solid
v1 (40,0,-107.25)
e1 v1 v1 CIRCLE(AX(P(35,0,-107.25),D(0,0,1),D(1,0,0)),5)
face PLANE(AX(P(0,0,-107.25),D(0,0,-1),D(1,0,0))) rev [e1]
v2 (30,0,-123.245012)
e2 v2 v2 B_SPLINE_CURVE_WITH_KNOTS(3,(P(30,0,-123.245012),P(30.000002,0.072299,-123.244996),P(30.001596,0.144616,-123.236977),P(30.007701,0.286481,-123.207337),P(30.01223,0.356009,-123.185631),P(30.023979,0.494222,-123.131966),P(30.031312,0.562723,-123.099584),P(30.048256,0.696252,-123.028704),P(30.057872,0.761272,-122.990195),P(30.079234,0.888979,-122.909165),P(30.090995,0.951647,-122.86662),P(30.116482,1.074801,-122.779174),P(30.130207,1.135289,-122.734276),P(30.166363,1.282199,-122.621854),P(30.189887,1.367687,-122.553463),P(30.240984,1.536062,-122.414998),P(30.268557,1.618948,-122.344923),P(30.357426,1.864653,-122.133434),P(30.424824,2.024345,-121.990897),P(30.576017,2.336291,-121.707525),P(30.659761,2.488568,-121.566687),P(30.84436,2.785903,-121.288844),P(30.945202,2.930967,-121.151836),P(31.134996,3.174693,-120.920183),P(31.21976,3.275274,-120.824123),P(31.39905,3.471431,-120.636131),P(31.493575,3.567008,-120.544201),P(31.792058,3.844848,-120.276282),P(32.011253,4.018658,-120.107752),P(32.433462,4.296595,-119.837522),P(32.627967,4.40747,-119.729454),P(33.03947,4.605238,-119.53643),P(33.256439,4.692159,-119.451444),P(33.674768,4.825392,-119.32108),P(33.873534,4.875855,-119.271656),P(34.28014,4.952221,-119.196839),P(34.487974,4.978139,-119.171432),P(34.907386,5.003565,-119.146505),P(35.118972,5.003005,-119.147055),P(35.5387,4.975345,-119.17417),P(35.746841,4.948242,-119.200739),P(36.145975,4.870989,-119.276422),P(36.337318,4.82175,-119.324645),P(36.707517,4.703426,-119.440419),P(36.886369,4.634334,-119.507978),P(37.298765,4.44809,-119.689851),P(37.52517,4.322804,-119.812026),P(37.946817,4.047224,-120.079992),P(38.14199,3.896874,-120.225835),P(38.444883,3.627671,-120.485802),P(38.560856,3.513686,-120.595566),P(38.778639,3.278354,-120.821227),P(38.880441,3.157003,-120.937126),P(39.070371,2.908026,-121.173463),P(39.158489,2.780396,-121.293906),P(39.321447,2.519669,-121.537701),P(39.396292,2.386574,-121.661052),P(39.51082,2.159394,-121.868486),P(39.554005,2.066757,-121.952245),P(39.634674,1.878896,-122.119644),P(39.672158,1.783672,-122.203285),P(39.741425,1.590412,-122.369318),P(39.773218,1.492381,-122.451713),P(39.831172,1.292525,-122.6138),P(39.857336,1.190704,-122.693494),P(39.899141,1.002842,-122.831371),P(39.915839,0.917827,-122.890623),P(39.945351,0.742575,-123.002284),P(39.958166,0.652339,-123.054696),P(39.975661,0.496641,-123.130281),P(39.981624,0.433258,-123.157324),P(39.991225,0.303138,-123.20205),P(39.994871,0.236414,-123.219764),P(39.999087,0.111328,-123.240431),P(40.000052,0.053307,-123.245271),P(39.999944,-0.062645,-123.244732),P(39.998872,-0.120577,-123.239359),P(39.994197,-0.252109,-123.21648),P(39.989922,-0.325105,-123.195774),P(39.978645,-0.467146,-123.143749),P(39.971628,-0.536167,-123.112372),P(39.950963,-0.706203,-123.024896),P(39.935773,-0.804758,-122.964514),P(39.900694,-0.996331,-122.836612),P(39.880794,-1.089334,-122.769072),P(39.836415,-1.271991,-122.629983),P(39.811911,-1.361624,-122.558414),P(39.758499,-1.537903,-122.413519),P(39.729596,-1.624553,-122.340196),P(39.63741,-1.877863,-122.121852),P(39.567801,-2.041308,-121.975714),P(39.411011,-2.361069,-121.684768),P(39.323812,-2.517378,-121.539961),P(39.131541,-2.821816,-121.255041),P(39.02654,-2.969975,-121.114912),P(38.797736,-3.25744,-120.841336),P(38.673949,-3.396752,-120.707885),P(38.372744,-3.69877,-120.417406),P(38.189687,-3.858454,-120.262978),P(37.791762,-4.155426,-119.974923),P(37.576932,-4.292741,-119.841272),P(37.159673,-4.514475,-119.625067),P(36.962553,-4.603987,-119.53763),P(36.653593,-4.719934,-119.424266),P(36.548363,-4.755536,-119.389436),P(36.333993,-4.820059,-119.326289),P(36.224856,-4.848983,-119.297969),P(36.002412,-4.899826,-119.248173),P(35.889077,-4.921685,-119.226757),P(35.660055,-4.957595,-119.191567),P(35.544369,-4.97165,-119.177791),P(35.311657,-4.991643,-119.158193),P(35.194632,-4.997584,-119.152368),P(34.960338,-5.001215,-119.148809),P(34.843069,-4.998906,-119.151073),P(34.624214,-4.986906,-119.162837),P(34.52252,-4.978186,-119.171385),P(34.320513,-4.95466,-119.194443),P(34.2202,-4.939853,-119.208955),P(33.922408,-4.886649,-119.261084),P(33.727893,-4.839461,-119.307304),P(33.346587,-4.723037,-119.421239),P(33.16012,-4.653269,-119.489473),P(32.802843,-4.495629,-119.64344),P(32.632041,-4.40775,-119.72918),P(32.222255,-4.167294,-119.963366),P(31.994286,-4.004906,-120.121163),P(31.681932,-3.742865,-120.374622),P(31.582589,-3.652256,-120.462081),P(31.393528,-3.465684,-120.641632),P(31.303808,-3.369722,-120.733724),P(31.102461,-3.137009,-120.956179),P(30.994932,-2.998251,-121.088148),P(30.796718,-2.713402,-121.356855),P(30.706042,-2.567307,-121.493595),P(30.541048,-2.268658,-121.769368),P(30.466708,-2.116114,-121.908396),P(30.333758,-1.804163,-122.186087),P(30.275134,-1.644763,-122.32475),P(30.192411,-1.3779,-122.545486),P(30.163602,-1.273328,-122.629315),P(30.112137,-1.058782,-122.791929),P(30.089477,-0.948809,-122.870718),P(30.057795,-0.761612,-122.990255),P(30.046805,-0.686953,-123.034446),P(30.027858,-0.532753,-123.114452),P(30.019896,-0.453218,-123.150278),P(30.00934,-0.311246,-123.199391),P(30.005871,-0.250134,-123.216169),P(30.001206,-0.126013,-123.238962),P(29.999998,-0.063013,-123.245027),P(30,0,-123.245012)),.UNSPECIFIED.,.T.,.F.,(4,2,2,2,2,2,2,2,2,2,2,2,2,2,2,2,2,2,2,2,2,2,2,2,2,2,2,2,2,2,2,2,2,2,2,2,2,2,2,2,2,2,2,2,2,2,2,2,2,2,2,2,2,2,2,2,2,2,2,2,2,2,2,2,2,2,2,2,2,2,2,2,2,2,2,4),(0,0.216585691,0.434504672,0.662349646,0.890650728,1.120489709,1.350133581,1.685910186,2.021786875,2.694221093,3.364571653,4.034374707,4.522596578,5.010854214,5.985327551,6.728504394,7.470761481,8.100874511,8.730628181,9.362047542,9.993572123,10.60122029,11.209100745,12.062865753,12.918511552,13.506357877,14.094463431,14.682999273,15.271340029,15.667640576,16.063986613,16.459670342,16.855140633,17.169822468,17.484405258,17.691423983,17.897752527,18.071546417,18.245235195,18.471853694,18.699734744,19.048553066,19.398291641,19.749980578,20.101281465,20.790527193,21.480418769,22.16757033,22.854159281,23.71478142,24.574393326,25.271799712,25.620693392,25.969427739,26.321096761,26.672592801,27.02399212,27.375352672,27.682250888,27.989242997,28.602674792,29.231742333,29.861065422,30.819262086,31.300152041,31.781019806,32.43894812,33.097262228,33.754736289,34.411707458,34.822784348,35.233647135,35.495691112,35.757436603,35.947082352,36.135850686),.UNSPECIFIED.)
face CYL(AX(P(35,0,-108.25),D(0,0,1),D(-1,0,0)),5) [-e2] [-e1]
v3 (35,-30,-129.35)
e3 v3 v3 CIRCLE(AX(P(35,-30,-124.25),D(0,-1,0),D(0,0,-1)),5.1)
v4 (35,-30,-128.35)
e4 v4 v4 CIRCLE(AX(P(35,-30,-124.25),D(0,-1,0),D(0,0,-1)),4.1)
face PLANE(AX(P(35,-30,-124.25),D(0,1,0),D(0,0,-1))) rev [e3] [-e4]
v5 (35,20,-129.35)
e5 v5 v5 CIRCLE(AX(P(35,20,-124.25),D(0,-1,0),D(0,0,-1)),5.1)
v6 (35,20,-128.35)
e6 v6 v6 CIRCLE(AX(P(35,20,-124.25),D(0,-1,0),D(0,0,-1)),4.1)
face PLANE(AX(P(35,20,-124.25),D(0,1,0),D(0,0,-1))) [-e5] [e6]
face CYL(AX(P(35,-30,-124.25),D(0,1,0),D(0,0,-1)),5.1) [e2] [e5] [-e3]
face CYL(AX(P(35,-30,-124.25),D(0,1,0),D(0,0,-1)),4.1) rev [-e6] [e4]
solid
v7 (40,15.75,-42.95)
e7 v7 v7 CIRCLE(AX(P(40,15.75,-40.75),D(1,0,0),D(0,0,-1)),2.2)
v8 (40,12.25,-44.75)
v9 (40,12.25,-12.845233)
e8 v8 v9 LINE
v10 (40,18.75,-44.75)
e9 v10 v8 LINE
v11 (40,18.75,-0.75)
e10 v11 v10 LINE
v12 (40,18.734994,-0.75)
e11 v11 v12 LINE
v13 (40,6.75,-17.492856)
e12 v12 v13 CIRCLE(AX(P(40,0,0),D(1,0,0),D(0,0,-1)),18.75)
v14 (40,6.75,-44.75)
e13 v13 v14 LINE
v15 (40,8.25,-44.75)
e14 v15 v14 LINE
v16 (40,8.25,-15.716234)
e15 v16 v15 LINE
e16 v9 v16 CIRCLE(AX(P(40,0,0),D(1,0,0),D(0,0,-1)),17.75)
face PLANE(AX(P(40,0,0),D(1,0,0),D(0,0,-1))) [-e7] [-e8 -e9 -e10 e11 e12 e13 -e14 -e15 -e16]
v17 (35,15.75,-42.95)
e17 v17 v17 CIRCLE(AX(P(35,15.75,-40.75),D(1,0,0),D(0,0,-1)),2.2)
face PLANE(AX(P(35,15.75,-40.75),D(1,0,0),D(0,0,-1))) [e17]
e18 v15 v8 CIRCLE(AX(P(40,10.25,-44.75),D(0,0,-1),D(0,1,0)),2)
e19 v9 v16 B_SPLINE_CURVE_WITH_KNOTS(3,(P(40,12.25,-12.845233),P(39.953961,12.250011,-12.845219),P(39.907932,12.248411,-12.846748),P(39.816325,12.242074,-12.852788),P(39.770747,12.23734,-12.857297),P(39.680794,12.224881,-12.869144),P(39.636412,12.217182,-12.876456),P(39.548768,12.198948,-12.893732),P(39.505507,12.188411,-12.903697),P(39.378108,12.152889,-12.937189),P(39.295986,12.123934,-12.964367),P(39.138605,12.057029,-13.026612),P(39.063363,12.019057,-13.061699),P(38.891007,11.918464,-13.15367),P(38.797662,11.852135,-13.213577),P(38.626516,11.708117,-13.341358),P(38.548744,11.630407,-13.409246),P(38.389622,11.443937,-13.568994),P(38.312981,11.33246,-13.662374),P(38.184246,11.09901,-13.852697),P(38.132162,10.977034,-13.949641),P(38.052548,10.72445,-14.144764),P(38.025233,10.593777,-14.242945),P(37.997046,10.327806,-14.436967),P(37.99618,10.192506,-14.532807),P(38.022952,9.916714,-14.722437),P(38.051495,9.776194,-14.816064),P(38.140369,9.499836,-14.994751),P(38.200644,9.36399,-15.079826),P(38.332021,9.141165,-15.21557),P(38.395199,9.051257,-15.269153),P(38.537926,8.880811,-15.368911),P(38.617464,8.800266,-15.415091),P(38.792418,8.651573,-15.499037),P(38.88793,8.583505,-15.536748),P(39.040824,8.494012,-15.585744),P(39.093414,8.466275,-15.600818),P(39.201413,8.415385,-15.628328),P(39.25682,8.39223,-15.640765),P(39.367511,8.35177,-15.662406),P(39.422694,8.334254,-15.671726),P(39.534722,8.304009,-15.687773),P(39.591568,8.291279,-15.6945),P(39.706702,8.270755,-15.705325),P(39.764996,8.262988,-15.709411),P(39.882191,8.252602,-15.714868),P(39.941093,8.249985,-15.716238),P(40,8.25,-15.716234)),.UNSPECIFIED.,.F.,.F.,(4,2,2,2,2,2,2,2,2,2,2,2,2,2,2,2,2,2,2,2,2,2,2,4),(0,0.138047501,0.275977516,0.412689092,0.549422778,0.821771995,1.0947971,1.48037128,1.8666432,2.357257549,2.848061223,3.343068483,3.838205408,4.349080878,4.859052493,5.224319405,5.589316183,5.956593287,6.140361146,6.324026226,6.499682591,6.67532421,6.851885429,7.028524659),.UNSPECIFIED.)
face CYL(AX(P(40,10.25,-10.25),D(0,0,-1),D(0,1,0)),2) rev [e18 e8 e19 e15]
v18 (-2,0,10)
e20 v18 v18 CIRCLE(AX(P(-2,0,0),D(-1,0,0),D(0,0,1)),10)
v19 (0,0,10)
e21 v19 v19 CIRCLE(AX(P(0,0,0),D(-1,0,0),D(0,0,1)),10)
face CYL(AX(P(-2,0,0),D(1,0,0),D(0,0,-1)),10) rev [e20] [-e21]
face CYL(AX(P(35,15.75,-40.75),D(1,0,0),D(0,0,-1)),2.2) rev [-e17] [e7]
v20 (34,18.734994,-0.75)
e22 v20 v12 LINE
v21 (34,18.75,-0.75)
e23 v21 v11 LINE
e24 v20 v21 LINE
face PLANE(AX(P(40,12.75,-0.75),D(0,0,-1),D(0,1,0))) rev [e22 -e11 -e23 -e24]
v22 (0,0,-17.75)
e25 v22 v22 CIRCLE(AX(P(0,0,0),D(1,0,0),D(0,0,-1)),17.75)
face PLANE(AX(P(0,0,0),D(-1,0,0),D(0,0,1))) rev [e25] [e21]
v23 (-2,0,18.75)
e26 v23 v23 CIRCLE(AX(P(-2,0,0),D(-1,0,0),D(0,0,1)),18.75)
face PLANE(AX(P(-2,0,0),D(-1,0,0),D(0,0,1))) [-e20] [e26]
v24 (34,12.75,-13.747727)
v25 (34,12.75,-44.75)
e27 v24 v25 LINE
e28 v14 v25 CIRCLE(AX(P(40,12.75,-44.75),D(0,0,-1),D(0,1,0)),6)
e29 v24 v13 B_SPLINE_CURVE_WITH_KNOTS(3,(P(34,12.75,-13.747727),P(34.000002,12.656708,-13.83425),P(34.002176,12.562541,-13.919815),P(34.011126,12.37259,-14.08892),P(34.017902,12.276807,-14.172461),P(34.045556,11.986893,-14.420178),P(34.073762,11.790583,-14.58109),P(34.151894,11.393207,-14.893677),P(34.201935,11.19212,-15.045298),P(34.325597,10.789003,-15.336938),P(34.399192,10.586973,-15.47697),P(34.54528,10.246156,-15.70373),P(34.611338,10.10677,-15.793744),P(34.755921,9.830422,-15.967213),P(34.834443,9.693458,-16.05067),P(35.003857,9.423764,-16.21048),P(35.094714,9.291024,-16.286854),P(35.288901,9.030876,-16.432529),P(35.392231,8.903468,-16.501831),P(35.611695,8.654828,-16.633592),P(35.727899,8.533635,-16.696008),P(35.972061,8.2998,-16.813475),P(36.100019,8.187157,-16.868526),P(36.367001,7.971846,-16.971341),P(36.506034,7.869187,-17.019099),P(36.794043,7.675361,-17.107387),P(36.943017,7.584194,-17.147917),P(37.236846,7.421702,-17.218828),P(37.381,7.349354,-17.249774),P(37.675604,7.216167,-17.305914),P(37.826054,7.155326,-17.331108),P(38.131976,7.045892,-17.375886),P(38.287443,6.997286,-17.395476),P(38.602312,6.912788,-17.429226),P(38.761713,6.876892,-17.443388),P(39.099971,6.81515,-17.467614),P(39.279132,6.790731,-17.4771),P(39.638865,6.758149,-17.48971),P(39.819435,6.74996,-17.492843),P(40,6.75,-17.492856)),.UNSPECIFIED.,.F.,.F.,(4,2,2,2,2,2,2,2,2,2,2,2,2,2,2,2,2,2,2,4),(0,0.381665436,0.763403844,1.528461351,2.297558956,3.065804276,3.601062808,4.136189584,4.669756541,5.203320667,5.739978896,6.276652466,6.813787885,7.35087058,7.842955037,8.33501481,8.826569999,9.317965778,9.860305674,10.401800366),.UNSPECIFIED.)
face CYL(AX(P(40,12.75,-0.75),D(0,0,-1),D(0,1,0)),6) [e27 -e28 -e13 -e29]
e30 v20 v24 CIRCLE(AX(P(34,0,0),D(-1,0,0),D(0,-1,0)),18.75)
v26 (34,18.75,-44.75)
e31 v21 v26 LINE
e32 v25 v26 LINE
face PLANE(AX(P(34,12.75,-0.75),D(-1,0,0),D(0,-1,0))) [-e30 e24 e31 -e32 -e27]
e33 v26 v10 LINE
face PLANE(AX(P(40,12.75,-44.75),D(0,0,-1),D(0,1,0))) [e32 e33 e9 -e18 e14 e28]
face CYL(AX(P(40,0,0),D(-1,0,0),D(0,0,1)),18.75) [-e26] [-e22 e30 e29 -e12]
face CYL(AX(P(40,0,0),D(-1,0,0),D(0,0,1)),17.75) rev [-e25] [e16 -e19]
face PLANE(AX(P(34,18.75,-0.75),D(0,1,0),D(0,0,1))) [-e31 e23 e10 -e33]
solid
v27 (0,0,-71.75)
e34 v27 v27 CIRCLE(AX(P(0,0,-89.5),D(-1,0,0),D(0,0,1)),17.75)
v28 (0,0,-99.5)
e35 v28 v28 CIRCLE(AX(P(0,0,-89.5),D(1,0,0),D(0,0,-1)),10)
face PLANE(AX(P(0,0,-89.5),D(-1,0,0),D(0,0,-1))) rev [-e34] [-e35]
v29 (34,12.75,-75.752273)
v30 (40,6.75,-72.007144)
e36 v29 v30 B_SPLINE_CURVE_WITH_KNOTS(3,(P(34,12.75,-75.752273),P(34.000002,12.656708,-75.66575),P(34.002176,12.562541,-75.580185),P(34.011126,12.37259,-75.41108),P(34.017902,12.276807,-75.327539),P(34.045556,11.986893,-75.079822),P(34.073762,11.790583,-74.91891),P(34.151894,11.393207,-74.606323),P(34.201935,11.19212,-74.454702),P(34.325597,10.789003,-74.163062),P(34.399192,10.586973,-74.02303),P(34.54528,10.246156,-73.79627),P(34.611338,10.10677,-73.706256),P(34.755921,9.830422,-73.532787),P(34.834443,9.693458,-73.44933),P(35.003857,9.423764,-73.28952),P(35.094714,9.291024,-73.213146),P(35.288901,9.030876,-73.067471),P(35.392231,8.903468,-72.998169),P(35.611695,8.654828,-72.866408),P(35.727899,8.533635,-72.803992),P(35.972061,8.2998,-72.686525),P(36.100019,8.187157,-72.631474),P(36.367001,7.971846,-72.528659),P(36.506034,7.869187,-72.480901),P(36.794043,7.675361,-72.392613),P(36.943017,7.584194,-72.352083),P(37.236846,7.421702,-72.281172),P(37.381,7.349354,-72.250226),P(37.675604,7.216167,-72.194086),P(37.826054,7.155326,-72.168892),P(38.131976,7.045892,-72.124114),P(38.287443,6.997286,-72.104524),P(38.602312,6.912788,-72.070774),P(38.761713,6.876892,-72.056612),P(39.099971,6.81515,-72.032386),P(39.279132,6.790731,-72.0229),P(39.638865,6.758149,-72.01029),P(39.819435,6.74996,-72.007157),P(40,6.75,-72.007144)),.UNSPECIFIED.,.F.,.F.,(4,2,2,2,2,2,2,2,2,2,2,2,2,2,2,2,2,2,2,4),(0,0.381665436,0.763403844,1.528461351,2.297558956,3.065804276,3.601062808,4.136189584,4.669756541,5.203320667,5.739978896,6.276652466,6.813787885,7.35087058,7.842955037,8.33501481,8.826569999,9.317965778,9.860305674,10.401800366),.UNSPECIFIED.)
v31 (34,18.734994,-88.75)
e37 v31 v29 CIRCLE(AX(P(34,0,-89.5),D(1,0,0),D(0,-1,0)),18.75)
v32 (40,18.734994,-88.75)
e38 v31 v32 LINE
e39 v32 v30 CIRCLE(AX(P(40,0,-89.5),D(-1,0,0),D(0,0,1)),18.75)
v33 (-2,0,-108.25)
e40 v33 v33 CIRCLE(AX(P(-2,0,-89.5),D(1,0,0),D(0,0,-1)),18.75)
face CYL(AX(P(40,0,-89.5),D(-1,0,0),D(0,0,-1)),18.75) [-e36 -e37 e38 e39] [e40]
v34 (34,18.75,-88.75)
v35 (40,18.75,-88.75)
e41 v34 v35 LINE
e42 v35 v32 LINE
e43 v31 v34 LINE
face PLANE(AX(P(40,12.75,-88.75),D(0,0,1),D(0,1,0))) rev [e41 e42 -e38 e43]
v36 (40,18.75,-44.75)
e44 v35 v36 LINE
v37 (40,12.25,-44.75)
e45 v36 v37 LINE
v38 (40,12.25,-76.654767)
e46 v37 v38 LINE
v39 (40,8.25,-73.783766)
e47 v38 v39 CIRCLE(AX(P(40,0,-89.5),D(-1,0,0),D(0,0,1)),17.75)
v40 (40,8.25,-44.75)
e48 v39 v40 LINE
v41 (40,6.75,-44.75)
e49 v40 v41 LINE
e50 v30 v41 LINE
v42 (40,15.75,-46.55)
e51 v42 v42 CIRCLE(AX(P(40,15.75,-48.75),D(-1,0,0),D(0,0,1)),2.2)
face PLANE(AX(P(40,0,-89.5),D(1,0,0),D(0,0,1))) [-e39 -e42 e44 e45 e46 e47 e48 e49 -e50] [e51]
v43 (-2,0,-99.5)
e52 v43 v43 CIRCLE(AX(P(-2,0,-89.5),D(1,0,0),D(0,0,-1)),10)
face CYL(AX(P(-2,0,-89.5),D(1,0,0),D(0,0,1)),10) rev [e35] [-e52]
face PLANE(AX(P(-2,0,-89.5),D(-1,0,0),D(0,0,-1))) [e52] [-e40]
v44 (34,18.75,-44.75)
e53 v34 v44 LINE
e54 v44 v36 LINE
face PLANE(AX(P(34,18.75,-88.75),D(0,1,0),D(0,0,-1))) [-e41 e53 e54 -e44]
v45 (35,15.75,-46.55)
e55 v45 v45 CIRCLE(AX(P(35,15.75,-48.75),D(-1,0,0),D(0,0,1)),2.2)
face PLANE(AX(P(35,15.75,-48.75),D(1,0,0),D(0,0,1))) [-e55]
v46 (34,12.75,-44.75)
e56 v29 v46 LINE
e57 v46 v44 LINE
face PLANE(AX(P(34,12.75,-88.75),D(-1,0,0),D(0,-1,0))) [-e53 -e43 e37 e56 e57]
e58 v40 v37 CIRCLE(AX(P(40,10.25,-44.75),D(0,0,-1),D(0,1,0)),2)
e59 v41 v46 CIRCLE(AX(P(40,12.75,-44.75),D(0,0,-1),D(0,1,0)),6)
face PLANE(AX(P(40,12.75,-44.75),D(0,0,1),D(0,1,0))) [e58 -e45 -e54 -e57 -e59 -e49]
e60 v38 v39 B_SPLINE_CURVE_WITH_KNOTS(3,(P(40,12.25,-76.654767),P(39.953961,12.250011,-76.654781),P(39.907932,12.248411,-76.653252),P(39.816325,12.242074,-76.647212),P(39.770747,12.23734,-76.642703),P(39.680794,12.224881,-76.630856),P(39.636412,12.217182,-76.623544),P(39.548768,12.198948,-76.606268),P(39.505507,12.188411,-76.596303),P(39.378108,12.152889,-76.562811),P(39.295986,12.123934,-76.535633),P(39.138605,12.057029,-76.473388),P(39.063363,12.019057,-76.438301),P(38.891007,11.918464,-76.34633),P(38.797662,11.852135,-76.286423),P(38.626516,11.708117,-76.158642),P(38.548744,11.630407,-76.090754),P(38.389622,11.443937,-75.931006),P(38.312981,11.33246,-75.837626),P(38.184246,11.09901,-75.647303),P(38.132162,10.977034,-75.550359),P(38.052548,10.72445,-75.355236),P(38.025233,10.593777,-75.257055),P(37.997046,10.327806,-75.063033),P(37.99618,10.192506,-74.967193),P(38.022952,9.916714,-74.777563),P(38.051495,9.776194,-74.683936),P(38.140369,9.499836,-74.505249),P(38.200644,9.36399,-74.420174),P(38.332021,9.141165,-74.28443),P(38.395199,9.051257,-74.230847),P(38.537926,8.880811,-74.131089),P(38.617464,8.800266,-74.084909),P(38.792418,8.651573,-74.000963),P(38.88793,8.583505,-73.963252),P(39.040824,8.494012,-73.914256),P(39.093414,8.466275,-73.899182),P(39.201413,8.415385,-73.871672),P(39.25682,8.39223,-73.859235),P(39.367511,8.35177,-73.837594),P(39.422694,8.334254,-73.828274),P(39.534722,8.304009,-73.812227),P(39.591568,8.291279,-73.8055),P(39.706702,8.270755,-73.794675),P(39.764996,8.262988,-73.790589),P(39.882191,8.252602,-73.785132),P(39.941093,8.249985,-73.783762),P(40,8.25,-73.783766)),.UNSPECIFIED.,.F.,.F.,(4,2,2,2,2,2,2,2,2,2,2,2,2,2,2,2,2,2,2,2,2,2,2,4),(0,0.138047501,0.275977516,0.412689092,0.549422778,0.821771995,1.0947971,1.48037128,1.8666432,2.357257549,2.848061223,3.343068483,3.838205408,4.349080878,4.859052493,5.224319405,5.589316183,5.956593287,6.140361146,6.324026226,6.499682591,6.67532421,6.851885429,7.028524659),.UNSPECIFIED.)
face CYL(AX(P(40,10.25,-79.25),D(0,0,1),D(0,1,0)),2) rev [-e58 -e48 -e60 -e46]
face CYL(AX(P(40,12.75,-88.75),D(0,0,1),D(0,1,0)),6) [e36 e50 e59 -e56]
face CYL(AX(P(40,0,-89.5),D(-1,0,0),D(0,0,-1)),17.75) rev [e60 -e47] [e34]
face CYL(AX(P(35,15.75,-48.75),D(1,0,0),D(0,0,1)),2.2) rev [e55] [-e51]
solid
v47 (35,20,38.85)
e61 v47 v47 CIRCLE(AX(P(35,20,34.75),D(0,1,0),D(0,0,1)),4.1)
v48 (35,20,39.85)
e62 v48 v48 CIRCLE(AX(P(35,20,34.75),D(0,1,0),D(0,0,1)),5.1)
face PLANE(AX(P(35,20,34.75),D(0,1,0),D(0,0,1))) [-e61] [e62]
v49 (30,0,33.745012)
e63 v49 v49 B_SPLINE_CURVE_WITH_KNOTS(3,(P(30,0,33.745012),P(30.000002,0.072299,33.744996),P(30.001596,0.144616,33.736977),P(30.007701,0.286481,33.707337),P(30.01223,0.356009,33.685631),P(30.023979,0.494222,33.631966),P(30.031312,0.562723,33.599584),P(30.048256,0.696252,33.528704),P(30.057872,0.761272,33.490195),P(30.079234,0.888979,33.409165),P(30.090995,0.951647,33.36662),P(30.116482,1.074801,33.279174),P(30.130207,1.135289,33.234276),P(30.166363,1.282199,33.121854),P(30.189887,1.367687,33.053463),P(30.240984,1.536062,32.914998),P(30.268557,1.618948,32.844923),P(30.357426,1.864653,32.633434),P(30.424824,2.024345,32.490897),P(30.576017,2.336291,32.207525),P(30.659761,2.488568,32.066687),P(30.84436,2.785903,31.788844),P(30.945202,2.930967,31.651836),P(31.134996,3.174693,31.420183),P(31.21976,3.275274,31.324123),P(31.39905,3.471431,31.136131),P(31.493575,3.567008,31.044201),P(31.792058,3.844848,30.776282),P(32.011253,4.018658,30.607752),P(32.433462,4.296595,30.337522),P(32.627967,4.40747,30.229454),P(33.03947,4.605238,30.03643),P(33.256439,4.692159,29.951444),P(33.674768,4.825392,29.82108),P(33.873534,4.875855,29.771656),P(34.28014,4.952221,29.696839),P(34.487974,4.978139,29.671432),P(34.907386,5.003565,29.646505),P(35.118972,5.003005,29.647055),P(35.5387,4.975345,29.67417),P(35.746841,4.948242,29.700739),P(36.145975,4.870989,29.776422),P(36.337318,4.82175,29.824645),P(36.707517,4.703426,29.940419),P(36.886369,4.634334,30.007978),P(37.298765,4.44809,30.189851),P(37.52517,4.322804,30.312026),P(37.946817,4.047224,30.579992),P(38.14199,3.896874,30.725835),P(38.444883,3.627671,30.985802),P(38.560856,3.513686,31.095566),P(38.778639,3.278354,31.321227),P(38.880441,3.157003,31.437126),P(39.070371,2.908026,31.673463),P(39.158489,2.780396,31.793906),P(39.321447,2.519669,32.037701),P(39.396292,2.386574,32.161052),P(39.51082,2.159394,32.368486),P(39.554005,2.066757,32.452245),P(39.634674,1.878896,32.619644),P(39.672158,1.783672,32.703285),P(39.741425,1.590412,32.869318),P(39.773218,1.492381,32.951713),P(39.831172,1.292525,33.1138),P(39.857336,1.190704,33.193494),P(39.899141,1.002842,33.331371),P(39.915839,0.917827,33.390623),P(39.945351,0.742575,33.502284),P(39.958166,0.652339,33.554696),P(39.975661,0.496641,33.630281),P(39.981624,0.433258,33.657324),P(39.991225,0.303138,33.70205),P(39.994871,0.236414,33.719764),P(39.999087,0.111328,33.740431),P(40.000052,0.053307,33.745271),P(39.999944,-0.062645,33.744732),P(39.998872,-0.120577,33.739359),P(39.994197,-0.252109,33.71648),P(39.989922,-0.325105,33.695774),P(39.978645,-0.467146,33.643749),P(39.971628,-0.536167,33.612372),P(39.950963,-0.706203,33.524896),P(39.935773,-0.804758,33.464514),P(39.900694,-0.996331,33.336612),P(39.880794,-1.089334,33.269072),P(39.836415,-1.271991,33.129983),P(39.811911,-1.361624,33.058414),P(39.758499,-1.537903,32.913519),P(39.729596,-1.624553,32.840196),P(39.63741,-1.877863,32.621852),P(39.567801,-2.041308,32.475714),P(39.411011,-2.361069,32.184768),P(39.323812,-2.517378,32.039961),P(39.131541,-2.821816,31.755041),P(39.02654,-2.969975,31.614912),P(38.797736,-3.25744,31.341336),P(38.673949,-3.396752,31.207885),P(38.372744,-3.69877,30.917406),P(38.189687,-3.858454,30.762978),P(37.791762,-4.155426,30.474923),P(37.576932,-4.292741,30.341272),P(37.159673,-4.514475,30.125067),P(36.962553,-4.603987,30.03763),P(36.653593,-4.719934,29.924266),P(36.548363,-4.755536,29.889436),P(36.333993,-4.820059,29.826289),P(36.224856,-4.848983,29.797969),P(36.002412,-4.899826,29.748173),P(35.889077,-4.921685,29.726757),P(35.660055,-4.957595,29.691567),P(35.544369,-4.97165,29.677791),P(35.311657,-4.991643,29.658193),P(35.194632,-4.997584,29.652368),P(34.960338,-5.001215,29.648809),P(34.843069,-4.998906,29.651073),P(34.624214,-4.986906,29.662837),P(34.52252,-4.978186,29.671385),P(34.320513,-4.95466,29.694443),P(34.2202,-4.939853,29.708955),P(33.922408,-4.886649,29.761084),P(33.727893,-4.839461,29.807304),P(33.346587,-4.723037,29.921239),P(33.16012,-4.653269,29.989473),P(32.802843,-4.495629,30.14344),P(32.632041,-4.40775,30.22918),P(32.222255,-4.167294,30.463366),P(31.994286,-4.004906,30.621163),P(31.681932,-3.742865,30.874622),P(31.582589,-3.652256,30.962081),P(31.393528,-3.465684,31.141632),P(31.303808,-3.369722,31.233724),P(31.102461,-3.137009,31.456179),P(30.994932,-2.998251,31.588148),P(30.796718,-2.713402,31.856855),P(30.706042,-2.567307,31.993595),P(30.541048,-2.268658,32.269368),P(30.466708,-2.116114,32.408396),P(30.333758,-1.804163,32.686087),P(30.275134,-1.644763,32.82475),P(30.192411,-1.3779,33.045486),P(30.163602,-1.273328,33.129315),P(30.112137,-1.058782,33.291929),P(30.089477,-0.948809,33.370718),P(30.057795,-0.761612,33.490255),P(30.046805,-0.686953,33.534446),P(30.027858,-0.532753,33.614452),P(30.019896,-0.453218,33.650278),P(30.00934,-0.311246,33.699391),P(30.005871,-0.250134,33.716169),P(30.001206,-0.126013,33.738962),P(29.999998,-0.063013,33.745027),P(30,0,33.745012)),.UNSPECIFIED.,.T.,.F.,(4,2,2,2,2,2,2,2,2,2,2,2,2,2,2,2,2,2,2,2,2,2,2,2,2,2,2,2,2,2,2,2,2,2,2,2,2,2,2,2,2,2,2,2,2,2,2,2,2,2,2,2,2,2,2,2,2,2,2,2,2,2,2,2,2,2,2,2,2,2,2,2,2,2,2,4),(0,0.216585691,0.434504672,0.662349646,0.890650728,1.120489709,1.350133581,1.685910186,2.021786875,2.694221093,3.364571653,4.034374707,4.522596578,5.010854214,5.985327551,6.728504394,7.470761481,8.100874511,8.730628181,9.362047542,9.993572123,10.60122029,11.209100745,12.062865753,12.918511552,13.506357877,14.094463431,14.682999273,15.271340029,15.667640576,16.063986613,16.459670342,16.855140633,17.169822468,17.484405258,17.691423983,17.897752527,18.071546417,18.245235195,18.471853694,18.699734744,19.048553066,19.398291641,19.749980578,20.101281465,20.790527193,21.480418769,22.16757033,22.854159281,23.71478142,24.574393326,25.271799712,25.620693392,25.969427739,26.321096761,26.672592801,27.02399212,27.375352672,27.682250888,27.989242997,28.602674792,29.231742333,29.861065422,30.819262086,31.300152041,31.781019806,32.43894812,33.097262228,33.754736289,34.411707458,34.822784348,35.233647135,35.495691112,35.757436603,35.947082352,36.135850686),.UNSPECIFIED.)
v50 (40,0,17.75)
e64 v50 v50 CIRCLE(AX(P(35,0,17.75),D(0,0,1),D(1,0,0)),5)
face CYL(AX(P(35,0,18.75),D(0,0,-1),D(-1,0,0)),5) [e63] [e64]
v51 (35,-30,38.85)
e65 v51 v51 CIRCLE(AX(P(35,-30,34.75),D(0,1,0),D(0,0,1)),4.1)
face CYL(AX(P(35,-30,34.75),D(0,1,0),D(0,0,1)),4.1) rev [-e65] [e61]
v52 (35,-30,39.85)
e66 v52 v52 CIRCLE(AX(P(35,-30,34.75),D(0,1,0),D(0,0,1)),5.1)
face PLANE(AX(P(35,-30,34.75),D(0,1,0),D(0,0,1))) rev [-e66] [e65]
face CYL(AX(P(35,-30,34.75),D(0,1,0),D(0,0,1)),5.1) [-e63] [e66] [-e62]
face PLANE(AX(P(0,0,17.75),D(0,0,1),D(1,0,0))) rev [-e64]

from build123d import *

# Parameters (mm, degrees)
SKETCH1_R                = 18.75
SKETCH1_R_2              = 17.75
BOSS_EXTRUDE1_DEPTH      = 40
BOSS_EXTRUDE2_START      = 2
SKETCH2_R                = 18.75
SKETCH2_R_2              = 10
BOSS_EXTRUDE2_DEPTH      = 2
BOSS_EXTRUDE4_START      = 17.75
BOSS_EXTRUDE4_OUTLINE_R  = 5
BOSS_EXTRUDE4_DEPTH      = 16
BOSS_EXTRUDE5_DEPTH      = 15
BOSS_EXTRUDE5_DEPTH_BACK = 35
SKETCH8_R                = 5.1
SKETCH8_R_2              = 4.1
SKETCH9_R                = 4.1
CUT_EXTRUDE1_DEPTH       = 32
BOSS_EXTRUDE6_DEPTH      = 26
BOSS_EXTRUDE6_DEPTH_BACK = 18
CUT_EXTRUDE2_START       = -26
SKETCH12_R               = 17.75
CUT_EXTRUDE2_DEPTH       = 26
SKETCH14_R               = 2.2
CUT_EXTRUDE4_DEPTH       = 5
SKETCH15_R               = 2
CUT_EXTRUDE5_DEPTH       = 34.5


# Read off the part's stored shape, not the designer's step: Boss-Extrude4
with BuildPart() as part:
    # Sketch1 → Boss-Extrude1 (new body)
    with BuildSketch(Plane.YZ):
        with Locations(Location((0, 0, 0), (0, 0, 270))):
            Circle(SKETCH1_R)
        with Locations(Location((0, 0, 0), (0, 0, 270))):
            Circle(SKETCH1_R_2, mode=Mode.SUBTRACT)
    extrude(amount=BOSS_EXTRUDE1_DEPTH)

    # Sketch2 → Boss-Extrude2 (add)
    with BuildSketch(Plane(origin=(0, 0, 0), x_dir=(0, -1, 0), z_dir=(-1, 0, 0)).offset(BOSS_EXTRUDE2_START)):
        with Locations(Location((0, 0, 0), (0, 0, 90))):
            Circle(SKETCH2_R)
        with Locations(Location((0, 0, 0), (0, 0, 90))):
            Circle(SKETCH2_R_2, mode=Mode.SUBTRACT)
    extrude(amount=-BOSS_EXTRUDE2_DEPTH)

    # Sketch11 → Boss-Extrude6 (add, two sides: drawn at the far end of the back side and taken through both)
    with BuildSketch(Plane.YX.offset(18.75).offset(-BOSS_EXTRUDE6_DEPTH_BACK)):
        with BuildLine():
            Line((6.75, 40), (18.75, 40))
            Line((18.75, 40), (18.75, 34))
            Line((18.75, 34), (12.75, 34))
            ThreePointArc((12.75, 34), (8.507359313, 35.757359313), (6.75, 40))
        make_face()
    extrude(amount=BOSS_EXTRUDE6_DEPTH + BOSS_EXTRUDE6_DEPTH_BACK)

    # Sketch12 → Cut-Extrude2 (cut)
    with BuildSketch(Plane.YZ.offset(40).offset(CUT_EXTRUDE2_START)):
        with Locations(Location((0, 0, 0), (0, 0, 270))):
            Circle(SKETCH12_R)
    extrude(amount=CUT_EXTRUDE2_DEPTH, mode=Mode.SUBTRACT)

    # Sketch14 → Cut-Extrude4 (cut)
    with BuildSketch(Plane.YZ.offset(40)):
        with Locations(Location((15.75, -40.75, 0), (0, 0, 270))):
            Circle(SKETCH14_R)
    extrude(amount=-CUT_EXTRUDE4_DEPTH, mode=Mode.SUBTRACT)

    # Sketch15 → Cut-Extrude5 (cut)
    with BuildSketch(Plane(origin=(0, 0, -44.75), x_dir=(1, 0, 0), z_dir=(0, 0, -1))):
        with Locations((40, -10.25)):
            Circle(SKETCH15_R)
    extrude(amount=-CUT_EXTRUDE5_DEPTH, mode=Mode.SUBTRACT)


with BuildPart() as body_2:
    # Boss-Extrude4 outline → Boss-Extrude4 (new body)
    with BuildSketch(Plane.XY.offset(BOSS_EXTRUDE4_START)):
        with Locations((35, 0)):
            Circle(BOSS_EXTRUDE4_OUTLINE_R)
    extrude(amount=BOSS_EXTRUDE4_DEPTH)

    # Sketch8 → Boss-Extrude5 (add, two sides: drawn at the far end of the back side and taken through both)
    with BuildSketch(Plane(origin=(0, 5, 0), x_dir=(-1, 0, 0), z_dir=(0, 1, 0)).offset(-BOSS_EXTRUDE5_DEPTH_BACK)):
        with Locations(Location((-35, 34.75, 0), (0, 0, 90))):
            Circle(SKETCH8_R)
        with Locations(Location((-35, 34.75, 0), (0, 0, 90))):
            Circle(SKETCH8_R_2, mode=Mode.SUBTRACT)
    extrude(amount=BOSS_EXTRUDE5_DEPTH + BOSS_EXTRUDE5_DEPTH_BACK)

    # Sketch9 → Cut-Extrude1 (cut)
    with BuildSketch(Plane(origin=(0, 20, 0), x_dir=(-1, 0, 0), z_dir=(0, 1, 0))):
        with Locations(Location((-35, 34.75, 0), (0, 0, 90))):
            Circle(SKETCH9_R)
    extrude(amount=-CUT_EXTRUDE1_DEPTH, mode=Mode.SUBTRACT)


with BuildPart() as body_3:
    # Mirror1: mirrored copy
    add(part.part.mirror(Plane(origin=(0, 0, -44.75), x_dir=(1, 0, 0), z_dir=(0, 0, -1))))


with BuildPart() as body_4:
    # Mirror1 2: mirrored copy
    add(body_2.part.mirror(Plane(origin=(0, 0, -44.75), x_dir=(1, 0, 0), z_dir=(0, 0, -1))))


solid = Compound([part.part, body_2.part, body_3.part, body_4.part])
